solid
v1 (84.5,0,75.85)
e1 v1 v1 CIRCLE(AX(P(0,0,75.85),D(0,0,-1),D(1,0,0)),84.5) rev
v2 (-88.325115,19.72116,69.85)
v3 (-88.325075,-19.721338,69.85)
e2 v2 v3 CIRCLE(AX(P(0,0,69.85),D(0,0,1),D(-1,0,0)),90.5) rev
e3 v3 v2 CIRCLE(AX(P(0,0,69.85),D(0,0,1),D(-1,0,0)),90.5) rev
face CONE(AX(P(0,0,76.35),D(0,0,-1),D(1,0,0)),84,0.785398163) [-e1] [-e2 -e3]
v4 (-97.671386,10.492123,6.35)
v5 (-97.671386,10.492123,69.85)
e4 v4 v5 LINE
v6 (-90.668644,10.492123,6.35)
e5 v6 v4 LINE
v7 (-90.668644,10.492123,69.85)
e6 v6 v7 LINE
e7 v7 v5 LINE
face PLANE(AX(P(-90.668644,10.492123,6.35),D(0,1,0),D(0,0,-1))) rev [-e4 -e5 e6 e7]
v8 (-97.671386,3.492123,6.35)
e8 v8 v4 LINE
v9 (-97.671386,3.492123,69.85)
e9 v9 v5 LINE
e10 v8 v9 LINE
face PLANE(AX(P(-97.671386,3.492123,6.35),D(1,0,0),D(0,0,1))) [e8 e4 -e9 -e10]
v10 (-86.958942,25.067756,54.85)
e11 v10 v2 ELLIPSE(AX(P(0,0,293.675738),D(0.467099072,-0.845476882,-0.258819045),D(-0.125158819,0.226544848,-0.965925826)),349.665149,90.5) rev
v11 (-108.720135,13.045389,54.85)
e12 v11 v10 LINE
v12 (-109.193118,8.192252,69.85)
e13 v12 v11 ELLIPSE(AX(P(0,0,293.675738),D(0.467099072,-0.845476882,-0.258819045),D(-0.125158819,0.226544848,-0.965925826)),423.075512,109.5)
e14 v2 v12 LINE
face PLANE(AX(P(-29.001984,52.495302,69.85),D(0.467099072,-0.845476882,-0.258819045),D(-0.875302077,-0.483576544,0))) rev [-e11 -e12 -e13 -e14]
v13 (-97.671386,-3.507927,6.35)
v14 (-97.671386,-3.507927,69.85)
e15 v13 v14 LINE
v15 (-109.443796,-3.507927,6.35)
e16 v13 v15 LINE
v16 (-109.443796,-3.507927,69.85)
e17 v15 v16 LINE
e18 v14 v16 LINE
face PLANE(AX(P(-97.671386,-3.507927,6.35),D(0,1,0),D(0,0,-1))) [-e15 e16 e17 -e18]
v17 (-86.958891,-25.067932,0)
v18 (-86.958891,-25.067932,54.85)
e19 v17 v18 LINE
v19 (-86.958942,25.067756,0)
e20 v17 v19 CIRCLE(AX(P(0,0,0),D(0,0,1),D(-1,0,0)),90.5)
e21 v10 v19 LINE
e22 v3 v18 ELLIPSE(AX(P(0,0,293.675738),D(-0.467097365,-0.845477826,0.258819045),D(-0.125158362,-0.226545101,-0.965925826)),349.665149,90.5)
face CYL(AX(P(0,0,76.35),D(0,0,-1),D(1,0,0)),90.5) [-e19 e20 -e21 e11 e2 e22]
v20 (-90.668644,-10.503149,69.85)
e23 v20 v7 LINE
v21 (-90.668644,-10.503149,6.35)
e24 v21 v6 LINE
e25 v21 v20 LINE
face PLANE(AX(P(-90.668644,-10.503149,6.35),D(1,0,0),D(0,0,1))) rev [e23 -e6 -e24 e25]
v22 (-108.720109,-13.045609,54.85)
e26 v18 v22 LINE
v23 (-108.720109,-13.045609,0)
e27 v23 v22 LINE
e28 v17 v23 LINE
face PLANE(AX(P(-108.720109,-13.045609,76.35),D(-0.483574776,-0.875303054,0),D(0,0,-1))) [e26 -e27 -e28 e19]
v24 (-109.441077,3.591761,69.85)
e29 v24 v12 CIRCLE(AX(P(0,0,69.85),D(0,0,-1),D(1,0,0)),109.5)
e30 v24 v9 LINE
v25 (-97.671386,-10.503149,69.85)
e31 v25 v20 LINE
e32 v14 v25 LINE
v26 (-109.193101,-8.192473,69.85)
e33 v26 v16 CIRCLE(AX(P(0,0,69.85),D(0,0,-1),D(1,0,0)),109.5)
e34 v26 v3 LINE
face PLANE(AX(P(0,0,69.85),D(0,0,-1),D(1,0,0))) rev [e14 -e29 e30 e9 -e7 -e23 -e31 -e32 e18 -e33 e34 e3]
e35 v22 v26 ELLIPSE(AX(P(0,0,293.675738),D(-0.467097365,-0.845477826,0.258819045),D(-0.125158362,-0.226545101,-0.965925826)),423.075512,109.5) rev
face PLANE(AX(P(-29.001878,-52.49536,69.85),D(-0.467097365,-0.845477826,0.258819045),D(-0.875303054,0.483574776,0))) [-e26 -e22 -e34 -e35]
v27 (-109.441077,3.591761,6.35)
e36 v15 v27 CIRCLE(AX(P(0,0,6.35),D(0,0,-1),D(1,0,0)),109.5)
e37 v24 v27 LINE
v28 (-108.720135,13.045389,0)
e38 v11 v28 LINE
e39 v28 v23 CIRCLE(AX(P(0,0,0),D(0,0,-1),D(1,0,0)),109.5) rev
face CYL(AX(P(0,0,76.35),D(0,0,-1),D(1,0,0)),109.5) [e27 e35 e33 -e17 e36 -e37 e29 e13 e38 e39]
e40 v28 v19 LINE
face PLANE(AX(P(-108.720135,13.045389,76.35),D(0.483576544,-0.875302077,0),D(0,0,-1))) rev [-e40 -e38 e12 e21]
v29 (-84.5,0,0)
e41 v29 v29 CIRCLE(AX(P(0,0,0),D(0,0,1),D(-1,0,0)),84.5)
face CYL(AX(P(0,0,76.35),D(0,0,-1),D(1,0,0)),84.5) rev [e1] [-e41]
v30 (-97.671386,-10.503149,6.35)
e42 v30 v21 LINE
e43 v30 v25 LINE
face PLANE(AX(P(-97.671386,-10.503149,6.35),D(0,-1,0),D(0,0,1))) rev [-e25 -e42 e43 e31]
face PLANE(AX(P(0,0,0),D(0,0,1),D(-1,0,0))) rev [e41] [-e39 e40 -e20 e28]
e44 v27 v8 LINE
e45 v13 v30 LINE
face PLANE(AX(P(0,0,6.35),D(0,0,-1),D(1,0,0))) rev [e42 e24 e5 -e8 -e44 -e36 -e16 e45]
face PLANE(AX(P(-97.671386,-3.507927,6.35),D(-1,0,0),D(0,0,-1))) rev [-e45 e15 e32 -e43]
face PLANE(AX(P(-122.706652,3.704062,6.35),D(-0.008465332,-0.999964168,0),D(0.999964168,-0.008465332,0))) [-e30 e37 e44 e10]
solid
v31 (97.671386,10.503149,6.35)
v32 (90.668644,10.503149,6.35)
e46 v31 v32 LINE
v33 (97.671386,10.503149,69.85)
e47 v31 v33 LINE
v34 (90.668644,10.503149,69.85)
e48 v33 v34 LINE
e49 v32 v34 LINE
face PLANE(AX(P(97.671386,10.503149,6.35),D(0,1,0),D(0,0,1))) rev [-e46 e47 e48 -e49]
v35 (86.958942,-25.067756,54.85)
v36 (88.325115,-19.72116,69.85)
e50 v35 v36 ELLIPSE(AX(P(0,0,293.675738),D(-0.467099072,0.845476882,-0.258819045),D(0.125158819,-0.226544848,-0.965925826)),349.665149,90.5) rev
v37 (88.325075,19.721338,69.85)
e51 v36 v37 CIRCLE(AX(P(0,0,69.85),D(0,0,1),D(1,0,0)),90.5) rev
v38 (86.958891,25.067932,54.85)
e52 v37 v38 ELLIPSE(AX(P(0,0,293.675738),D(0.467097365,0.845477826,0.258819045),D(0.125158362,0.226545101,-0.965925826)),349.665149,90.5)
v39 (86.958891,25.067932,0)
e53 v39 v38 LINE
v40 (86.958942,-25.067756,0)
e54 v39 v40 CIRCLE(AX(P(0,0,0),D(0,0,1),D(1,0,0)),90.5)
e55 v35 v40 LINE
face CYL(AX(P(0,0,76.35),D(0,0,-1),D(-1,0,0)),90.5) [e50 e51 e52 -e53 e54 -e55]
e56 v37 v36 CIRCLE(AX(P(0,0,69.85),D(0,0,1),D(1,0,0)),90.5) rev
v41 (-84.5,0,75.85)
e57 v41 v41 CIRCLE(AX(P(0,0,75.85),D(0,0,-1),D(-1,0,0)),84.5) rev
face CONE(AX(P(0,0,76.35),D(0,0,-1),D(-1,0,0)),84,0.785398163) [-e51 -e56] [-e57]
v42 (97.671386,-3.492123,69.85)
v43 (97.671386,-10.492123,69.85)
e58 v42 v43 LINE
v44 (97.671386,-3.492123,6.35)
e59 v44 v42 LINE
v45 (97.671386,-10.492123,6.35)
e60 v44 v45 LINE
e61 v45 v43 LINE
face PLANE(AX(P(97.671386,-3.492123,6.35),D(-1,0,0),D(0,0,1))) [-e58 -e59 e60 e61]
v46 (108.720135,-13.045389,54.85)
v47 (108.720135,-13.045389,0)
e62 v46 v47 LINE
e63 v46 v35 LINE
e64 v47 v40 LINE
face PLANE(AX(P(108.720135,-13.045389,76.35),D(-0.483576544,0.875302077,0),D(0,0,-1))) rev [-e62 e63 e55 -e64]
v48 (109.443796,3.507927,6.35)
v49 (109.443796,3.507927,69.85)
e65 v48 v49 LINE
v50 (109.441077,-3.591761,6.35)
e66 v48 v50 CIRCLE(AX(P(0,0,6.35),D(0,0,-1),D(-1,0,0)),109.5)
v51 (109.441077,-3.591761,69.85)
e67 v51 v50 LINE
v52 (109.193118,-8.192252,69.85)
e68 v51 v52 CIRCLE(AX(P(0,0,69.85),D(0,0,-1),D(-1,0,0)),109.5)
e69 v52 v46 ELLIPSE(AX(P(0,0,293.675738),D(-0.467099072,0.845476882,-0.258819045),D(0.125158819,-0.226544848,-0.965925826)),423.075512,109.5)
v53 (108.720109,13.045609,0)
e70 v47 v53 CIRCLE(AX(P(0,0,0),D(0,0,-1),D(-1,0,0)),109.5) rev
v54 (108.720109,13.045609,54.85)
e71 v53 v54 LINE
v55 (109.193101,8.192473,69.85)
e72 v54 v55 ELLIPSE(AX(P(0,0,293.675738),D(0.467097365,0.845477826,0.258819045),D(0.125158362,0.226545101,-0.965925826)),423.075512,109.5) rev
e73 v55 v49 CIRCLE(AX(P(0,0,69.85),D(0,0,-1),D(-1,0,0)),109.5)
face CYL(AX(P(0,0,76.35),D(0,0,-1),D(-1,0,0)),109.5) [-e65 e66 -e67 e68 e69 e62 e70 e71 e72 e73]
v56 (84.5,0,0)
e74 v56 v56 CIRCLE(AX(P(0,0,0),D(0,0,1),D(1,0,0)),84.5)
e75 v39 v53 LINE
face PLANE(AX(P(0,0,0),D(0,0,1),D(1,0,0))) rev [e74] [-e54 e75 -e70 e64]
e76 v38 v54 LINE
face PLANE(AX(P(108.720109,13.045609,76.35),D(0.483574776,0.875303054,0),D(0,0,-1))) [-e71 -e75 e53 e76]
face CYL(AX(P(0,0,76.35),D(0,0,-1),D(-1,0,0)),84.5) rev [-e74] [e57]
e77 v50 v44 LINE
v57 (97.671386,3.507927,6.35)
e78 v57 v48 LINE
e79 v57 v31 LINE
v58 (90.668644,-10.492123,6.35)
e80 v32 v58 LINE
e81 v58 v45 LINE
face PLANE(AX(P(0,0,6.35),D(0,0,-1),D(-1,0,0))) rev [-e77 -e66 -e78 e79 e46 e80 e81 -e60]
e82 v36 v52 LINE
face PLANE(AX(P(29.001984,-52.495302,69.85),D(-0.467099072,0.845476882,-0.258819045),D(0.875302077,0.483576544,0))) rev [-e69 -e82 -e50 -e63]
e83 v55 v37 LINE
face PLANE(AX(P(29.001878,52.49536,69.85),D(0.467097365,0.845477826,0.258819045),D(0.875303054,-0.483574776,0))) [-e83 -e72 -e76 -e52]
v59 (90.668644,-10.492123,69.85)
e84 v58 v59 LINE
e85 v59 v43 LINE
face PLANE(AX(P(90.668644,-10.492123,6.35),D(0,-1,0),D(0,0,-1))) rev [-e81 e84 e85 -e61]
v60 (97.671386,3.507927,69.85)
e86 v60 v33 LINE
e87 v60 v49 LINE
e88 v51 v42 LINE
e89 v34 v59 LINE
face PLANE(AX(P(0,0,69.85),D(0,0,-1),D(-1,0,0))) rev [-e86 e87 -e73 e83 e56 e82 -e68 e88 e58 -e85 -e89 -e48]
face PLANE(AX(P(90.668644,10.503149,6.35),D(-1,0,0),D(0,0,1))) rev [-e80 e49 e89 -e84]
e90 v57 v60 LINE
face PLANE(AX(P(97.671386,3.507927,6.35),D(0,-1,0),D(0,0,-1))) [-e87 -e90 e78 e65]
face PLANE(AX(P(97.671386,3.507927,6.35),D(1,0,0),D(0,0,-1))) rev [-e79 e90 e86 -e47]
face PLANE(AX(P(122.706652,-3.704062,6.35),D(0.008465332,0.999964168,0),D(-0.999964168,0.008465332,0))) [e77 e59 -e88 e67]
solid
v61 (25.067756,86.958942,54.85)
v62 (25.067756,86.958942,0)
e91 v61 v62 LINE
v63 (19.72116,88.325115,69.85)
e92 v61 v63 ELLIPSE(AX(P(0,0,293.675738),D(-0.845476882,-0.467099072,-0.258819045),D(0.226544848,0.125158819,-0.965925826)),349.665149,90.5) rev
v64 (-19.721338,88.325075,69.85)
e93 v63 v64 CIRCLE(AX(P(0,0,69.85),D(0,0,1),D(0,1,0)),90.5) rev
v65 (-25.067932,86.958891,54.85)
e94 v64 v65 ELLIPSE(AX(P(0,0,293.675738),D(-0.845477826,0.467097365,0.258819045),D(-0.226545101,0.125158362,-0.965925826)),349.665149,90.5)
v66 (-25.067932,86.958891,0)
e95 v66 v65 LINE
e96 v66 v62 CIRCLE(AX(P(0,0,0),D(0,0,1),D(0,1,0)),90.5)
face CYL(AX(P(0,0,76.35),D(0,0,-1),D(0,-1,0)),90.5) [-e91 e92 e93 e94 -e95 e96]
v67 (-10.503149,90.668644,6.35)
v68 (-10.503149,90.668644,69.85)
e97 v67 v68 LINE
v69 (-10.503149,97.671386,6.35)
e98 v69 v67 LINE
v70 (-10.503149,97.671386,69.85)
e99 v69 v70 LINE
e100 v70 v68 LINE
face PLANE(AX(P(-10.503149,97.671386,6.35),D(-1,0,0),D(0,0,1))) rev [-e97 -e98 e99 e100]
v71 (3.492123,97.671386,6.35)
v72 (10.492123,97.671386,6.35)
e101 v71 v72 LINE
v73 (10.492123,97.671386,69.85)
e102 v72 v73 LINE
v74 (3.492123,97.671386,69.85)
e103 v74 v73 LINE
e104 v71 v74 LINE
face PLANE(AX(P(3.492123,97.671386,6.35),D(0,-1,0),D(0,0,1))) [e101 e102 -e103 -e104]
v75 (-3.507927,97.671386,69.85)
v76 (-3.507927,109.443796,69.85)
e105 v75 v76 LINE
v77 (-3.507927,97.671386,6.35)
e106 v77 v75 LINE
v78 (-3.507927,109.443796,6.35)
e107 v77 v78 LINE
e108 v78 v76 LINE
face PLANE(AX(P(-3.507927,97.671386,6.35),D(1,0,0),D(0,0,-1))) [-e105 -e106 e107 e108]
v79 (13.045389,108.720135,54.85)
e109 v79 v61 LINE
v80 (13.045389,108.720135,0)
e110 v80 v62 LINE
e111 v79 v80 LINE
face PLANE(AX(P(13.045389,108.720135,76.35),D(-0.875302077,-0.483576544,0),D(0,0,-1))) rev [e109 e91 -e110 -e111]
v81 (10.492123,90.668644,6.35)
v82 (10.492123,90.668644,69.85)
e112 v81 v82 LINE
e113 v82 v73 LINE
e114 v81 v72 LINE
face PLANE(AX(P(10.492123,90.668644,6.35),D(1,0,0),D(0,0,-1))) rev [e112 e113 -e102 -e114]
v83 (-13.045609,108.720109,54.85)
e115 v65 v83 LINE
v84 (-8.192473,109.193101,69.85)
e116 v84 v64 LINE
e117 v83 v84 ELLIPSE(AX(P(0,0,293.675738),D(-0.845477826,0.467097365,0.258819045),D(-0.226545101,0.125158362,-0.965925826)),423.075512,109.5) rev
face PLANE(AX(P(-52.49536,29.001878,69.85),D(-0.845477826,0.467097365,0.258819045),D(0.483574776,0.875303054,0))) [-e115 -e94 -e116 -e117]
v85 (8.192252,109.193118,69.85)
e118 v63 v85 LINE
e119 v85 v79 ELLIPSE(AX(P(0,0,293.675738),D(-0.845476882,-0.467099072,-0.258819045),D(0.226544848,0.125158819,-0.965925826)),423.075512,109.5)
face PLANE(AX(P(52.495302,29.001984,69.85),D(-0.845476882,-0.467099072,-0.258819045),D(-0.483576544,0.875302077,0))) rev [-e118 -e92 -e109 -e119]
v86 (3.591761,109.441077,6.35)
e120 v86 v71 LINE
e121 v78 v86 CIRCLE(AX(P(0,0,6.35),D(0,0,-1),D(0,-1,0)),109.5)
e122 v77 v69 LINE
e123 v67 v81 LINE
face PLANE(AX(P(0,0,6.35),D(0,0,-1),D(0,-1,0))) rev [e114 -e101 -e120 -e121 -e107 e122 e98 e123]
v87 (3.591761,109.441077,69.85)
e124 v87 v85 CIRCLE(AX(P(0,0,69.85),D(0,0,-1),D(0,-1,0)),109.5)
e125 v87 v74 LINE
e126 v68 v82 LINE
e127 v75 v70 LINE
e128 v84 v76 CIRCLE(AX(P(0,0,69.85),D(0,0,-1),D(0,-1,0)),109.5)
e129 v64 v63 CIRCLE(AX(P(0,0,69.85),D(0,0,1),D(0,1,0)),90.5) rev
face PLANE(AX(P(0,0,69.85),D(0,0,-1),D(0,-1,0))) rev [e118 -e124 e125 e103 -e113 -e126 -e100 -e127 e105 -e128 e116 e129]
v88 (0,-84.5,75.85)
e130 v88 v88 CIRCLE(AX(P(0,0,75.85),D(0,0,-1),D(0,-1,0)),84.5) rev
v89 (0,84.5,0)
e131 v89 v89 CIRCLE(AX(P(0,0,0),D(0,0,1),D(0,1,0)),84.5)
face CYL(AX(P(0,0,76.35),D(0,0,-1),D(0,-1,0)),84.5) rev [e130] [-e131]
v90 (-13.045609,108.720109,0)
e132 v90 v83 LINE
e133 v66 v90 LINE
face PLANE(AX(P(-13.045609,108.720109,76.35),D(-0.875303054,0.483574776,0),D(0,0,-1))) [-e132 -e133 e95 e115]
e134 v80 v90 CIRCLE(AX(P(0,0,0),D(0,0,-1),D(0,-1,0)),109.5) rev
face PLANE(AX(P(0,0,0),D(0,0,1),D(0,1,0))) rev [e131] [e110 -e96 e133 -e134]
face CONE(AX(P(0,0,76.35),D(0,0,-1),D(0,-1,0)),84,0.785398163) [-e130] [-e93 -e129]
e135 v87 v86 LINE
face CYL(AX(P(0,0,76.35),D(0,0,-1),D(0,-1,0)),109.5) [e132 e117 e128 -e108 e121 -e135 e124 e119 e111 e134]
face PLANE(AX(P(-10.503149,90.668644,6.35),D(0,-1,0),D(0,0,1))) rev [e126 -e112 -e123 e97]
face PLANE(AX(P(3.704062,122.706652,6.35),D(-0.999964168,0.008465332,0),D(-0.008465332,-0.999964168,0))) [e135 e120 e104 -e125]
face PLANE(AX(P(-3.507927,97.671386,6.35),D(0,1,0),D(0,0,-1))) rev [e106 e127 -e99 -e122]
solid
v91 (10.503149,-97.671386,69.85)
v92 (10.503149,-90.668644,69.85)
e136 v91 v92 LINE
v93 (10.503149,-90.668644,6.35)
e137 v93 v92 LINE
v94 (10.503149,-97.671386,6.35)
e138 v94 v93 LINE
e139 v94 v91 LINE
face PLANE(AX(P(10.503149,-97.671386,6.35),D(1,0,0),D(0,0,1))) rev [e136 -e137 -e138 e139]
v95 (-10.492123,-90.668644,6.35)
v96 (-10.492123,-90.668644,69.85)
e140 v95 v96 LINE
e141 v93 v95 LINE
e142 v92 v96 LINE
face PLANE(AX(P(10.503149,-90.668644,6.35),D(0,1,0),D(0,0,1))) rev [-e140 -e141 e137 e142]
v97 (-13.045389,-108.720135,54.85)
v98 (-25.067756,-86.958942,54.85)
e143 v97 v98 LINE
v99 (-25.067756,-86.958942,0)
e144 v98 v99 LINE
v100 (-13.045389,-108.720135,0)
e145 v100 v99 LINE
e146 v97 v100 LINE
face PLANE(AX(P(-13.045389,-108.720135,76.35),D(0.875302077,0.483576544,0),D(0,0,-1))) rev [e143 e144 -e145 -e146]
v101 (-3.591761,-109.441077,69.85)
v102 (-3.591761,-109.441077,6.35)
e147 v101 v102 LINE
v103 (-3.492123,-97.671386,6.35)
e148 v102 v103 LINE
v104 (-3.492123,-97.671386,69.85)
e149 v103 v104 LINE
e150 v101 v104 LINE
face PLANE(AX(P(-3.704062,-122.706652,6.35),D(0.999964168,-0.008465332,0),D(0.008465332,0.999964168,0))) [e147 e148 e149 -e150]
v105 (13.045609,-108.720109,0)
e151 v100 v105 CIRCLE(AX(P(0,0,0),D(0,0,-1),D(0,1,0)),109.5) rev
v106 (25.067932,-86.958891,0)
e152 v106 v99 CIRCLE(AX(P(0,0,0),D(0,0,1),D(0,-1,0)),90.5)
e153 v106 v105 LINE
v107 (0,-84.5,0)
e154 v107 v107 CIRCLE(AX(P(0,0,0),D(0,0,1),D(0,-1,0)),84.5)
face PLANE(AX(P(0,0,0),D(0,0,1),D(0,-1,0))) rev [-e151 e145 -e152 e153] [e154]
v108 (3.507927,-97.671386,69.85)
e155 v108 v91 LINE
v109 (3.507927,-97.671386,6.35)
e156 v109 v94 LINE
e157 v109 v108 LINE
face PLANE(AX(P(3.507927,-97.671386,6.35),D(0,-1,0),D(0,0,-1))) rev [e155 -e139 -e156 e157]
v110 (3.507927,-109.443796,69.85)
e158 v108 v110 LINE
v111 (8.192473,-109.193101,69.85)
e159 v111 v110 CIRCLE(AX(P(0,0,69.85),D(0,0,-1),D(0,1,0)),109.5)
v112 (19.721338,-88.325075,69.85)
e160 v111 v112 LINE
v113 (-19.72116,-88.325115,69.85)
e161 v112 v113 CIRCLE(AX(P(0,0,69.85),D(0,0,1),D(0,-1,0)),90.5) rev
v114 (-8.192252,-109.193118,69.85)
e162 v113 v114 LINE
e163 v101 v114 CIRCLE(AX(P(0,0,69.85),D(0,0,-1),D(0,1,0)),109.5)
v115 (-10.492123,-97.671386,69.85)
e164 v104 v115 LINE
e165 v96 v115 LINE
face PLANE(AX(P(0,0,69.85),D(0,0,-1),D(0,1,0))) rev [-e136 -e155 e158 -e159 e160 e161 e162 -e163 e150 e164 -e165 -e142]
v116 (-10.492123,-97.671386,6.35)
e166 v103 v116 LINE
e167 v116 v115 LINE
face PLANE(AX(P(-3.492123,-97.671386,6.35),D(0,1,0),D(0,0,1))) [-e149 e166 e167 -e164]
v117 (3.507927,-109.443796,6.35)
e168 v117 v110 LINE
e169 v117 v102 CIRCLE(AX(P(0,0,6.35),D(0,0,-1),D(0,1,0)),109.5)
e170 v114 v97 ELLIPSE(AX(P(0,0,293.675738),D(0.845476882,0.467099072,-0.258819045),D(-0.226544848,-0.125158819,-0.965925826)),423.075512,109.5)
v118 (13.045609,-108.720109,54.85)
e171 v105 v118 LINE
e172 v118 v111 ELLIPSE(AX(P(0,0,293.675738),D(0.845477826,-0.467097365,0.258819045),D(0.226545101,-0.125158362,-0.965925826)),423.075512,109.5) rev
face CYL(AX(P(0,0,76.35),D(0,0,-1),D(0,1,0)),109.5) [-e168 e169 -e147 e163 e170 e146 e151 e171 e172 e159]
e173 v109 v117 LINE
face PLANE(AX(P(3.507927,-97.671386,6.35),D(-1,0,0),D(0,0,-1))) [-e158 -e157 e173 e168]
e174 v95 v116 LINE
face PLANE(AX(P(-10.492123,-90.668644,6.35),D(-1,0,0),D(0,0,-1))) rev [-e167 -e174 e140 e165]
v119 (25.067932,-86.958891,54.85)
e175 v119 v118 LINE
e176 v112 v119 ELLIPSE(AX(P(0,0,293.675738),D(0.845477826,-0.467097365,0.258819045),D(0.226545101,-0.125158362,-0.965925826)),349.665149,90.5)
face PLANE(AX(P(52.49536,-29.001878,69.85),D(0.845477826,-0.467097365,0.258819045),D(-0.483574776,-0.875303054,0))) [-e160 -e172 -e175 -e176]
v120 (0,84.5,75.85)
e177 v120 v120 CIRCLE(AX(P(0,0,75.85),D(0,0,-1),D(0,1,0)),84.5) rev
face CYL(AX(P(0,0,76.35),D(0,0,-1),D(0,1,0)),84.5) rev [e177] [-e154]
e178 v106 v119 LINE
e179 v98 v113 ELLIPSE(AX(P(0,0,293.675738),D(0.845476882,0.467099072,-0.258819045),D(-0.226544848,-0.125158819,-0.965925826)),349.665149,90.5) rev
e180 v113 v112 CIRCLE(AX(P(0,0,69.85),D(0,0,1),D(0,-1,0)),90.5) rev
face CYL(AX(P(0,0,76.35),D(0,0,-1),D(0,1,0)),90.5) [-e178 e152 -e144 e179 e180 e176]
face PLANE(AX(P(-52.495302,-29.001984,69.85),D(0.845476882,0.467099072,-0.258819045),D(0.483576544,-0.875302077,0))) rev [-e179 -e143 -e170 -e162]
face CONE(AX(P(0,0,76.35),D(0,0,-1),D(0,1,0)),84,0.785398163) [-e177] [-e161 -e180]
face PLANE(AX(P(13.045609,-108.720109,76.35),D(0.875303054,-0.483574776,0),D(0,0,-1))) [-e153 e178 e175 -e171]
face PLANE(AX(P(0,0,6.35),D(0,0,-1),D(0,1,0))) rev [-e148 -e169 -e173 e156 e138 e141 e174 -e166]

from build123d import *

# Parameters (mm, degrees)
SKETCH1_R           = 90.5
SKETCH1_R_2         = 84.5
BOSS_EXTRUDE1_DEPTH = 76.35
CHAMFER1_SIZE       = 6.5
WRAP12_SECTION_W    = 19
WRAP12_SECTION_H    = 69.85
WRAP12_ANGLE        = 32.161608832
CUT_EXTRUDE1_DEPTH  = 63.5
CHAMFER2_SIZE       = 19
CHAMFER5_SIZE       = 15
CHAMFER5_SIZE_2     = 4.019237886
CIRPATTERN6_COUNT   = 4


with BuildPart() as part:
    # Sketch1 → Boss-Extrude1 (new body)
    with BuildSketch(Plane.XY):
        Circle(SKETCH1_R)
        Circle(SKETCH1_R_2, mode=Mode.SUBTRACT)
    extrude(amount=BOSS_EXTRUDE1_DEPTH)

    # Chamfer1
    # the kernel refuses this chamfer: 6.5 mm, written as the material it takes off along each edge
    with BuildSketch(Plane(origin=(0, 0, 76.35), x_dir=(1, 0, 0), z_dir=(0, -1, 0))) as chamfer1_piece_1:
        Polygon((90.5, -CHAMFER1_SIZE), (90.5 - CHAMFER1_SIZE, 0), (90.5, 0), align=None)
    revolve(axis=Axis((0, 0, 76.35), (0, 0, 1)), mode=Mode.SUBTRACT)

    # Wrap12 section (on wrap section) → Wrap12 (revolve)
    with BuildSketch(Plane(origin=(0, 0, 0), x_dir=(0.9608717281441653, 0.276993722046629, 0), z_dir=(-0.276993722046629, 0.9608717281441653, 0))):
        with Locations((100, -34.925)):
            Rectangle(WRAP12_SECTION_W, WRAP12_SECTION_H)
    revolve(axis=Axis((0, 0, 0), (0, 0, -1)), revolution_arc=WRAP12_ANGLE)

    # Sketch12 → Cut-Extrude1 (cut)
    with BuildSketch(Plane.XY.offset(69.85)):
        Polygon((122.706651928, -0.201195148), (122.706651928, 3.507927311), (97.67138598, 3.507927311), (97.67138598, 10.503148948), (90.66864355, 10.503148948), (90.66864355, -10.492123054), (97.67138598, -10.492123054), (97.67138598, -3.492123054), (122.706651928, -3.70406248), align=None)
    extrude(amount=-CUT_EXTRUDE1_DEPTH, mode=Mode.SUBTRACT)

    # Chamfer2
    # the kernel refuses this chamfer: 19 mm, written as the material it takes off along each edge
    with BuildSketch(Plane(origin=(105.215515497, -30.330600038, 118.711976771), x_dir=(-0.9608722876451651, 0.27699178116967144, 0), z_dir=(0, 0, -1))) as chamfer2_piece_1_section:
        with BuildLine():
            Line((CHAMFER2_SIZE, 0), (1.420369251, 17.579630749))
            ThreePointArc((1.420369251, 17.579630749), (0.375784571, 9.063973019), (0, 0))
            Line((0, 0), (CHAMFER2_SIZE, 0))
        make_face()
    chamfer2_piece_1 = extrude(amount=167.573953543, mode=Mode.PRIVATE)
    chamfer2_piece_1 = chamfer2_piece_1 - Plane(origin=(0, 0, 118.711976771), x_dir=(1, 0, 0), z_dir=(0, 0, -1)) * Cylinder(90.5, 412, mode=Mode.PRIVATE)
    add(chamfer2_piece_1, mode=Mode.SUBTRACT)
    with BuildSketch(Plane(origin=(105.215454232, 30.330812564, 118.711976771), x_dir=(-0.9608717281441654, -0.2769937220466291, 0), z_dir=(0, 0, -1))) as chamfer2_piece_2_section:
        with BuildLine():
            Line((CHAMFER2_SIZE, 0), (1.420369251, -17.579630749))
            ThreePointArc((1.420369251, -17.579630749), (0.375784571, -9.063973019), (0, 0))
            Line((0, 0), (CHAMFER2_SIZE, 0))
        make_face()
    chamfer2_piece_2 = extrude(amount=167.573953543, mode=Mode.PRIVATE)
    chamfer2_piece_2 = chamfer2_piece_2 - Plane(origin=(0, 0, 118.711976771), x_dir=(1, 0, 0), z_dir=(0, 0, -1)) * Cylinder(90.5, 412, mode=Mode.PRIVATE)
    add(chamfer2_piece_2, mode=Mode.SUBTRACT)

    # Chamfer5
    # the kernel refuses this chamfer: 15, 4.019237886 mm, written as the material it takes off along each edge
    with BuildSketch(Plane(origin=(52.865116584, 43.903567605, 69.85), x_dir=(0, 0, -1), z_dir=(0.8753030540266438, -0.483574775615551, 0))) as chamfer5_piece_1_section:
        Polygon((CHAMFER5_SIZE, 0), (0, -CHAMFER5_SIZE_2), (0, 0), align=None)
    chamfer5_piece_1 = extrude(amount=102.762999332, mode=Mode.PRIVATE)
    chamfer5_piece_1 = chamfer5_piece_1 - Plane(origin=(0, 0, 69.85), x_dir=(1, 0, 0), z_dir=(0, 0, -1)) * Cylinder(90.5, 266, mode=Mode.PRIVATE)
    add(chamfer5_piece_1, mode=Mode.SUBTRACT)
    with BuildSketch(Plane(origin=(52.865205265, -43.903460822, 69.85), x_dir=(0, 0, -1), z_dir=(0.8753020772463168, 0.48357654364979585, 0))) as chamfer5_piece_2_section:
        Polygon((CHAMFER5_SIZE, 0), (0, CHAMFER5_SIZE_2), (0, 0), align=None)
    chamfer5_piece_2 = extrude(amount=102.762999332, mode=Mode.PRIVATE)
    chamfer5_piece_2 = chamfer5_piece_2 - Plane(origin=(0, 0, 69.85), x_dir=(1, 0, 0), z_dir=(0, 0, -1)) * Cylinder(90.5, 266, mode=Mode.PRIVATE)
    add(chamfer5_piece_2, mode=Mode.SUBTRACT)


with BuildPart() as cirpattern6_1:
    # CirPattern6: pattern copy
    add(part.part.rotate(Axis((0, 0, 0), (0, 0, 1)), 1 * 360 / CIRPATTERN6_COUNT))


with BuildPart() as cirpattern6_2:
    # CirPattern6: pattern copy
    add(part.part.rotate(Axis((0, 0, 0), (0, 0, 1)), 2 * 360 / CIRPATTERN6_COUNT))


with BuildPart() as cirpattern6_3:
    # CirPattern6: pattern copy
    add(part.part.rotate(Axis((0, 0, 0), (0, 0, 1)), 3 * 360 / CIRPATTERN6_COUNT))


solid = Compound([part.part, cirpattern6_1.part, cirpattern6_2.part, cirpattern6_3.part])
